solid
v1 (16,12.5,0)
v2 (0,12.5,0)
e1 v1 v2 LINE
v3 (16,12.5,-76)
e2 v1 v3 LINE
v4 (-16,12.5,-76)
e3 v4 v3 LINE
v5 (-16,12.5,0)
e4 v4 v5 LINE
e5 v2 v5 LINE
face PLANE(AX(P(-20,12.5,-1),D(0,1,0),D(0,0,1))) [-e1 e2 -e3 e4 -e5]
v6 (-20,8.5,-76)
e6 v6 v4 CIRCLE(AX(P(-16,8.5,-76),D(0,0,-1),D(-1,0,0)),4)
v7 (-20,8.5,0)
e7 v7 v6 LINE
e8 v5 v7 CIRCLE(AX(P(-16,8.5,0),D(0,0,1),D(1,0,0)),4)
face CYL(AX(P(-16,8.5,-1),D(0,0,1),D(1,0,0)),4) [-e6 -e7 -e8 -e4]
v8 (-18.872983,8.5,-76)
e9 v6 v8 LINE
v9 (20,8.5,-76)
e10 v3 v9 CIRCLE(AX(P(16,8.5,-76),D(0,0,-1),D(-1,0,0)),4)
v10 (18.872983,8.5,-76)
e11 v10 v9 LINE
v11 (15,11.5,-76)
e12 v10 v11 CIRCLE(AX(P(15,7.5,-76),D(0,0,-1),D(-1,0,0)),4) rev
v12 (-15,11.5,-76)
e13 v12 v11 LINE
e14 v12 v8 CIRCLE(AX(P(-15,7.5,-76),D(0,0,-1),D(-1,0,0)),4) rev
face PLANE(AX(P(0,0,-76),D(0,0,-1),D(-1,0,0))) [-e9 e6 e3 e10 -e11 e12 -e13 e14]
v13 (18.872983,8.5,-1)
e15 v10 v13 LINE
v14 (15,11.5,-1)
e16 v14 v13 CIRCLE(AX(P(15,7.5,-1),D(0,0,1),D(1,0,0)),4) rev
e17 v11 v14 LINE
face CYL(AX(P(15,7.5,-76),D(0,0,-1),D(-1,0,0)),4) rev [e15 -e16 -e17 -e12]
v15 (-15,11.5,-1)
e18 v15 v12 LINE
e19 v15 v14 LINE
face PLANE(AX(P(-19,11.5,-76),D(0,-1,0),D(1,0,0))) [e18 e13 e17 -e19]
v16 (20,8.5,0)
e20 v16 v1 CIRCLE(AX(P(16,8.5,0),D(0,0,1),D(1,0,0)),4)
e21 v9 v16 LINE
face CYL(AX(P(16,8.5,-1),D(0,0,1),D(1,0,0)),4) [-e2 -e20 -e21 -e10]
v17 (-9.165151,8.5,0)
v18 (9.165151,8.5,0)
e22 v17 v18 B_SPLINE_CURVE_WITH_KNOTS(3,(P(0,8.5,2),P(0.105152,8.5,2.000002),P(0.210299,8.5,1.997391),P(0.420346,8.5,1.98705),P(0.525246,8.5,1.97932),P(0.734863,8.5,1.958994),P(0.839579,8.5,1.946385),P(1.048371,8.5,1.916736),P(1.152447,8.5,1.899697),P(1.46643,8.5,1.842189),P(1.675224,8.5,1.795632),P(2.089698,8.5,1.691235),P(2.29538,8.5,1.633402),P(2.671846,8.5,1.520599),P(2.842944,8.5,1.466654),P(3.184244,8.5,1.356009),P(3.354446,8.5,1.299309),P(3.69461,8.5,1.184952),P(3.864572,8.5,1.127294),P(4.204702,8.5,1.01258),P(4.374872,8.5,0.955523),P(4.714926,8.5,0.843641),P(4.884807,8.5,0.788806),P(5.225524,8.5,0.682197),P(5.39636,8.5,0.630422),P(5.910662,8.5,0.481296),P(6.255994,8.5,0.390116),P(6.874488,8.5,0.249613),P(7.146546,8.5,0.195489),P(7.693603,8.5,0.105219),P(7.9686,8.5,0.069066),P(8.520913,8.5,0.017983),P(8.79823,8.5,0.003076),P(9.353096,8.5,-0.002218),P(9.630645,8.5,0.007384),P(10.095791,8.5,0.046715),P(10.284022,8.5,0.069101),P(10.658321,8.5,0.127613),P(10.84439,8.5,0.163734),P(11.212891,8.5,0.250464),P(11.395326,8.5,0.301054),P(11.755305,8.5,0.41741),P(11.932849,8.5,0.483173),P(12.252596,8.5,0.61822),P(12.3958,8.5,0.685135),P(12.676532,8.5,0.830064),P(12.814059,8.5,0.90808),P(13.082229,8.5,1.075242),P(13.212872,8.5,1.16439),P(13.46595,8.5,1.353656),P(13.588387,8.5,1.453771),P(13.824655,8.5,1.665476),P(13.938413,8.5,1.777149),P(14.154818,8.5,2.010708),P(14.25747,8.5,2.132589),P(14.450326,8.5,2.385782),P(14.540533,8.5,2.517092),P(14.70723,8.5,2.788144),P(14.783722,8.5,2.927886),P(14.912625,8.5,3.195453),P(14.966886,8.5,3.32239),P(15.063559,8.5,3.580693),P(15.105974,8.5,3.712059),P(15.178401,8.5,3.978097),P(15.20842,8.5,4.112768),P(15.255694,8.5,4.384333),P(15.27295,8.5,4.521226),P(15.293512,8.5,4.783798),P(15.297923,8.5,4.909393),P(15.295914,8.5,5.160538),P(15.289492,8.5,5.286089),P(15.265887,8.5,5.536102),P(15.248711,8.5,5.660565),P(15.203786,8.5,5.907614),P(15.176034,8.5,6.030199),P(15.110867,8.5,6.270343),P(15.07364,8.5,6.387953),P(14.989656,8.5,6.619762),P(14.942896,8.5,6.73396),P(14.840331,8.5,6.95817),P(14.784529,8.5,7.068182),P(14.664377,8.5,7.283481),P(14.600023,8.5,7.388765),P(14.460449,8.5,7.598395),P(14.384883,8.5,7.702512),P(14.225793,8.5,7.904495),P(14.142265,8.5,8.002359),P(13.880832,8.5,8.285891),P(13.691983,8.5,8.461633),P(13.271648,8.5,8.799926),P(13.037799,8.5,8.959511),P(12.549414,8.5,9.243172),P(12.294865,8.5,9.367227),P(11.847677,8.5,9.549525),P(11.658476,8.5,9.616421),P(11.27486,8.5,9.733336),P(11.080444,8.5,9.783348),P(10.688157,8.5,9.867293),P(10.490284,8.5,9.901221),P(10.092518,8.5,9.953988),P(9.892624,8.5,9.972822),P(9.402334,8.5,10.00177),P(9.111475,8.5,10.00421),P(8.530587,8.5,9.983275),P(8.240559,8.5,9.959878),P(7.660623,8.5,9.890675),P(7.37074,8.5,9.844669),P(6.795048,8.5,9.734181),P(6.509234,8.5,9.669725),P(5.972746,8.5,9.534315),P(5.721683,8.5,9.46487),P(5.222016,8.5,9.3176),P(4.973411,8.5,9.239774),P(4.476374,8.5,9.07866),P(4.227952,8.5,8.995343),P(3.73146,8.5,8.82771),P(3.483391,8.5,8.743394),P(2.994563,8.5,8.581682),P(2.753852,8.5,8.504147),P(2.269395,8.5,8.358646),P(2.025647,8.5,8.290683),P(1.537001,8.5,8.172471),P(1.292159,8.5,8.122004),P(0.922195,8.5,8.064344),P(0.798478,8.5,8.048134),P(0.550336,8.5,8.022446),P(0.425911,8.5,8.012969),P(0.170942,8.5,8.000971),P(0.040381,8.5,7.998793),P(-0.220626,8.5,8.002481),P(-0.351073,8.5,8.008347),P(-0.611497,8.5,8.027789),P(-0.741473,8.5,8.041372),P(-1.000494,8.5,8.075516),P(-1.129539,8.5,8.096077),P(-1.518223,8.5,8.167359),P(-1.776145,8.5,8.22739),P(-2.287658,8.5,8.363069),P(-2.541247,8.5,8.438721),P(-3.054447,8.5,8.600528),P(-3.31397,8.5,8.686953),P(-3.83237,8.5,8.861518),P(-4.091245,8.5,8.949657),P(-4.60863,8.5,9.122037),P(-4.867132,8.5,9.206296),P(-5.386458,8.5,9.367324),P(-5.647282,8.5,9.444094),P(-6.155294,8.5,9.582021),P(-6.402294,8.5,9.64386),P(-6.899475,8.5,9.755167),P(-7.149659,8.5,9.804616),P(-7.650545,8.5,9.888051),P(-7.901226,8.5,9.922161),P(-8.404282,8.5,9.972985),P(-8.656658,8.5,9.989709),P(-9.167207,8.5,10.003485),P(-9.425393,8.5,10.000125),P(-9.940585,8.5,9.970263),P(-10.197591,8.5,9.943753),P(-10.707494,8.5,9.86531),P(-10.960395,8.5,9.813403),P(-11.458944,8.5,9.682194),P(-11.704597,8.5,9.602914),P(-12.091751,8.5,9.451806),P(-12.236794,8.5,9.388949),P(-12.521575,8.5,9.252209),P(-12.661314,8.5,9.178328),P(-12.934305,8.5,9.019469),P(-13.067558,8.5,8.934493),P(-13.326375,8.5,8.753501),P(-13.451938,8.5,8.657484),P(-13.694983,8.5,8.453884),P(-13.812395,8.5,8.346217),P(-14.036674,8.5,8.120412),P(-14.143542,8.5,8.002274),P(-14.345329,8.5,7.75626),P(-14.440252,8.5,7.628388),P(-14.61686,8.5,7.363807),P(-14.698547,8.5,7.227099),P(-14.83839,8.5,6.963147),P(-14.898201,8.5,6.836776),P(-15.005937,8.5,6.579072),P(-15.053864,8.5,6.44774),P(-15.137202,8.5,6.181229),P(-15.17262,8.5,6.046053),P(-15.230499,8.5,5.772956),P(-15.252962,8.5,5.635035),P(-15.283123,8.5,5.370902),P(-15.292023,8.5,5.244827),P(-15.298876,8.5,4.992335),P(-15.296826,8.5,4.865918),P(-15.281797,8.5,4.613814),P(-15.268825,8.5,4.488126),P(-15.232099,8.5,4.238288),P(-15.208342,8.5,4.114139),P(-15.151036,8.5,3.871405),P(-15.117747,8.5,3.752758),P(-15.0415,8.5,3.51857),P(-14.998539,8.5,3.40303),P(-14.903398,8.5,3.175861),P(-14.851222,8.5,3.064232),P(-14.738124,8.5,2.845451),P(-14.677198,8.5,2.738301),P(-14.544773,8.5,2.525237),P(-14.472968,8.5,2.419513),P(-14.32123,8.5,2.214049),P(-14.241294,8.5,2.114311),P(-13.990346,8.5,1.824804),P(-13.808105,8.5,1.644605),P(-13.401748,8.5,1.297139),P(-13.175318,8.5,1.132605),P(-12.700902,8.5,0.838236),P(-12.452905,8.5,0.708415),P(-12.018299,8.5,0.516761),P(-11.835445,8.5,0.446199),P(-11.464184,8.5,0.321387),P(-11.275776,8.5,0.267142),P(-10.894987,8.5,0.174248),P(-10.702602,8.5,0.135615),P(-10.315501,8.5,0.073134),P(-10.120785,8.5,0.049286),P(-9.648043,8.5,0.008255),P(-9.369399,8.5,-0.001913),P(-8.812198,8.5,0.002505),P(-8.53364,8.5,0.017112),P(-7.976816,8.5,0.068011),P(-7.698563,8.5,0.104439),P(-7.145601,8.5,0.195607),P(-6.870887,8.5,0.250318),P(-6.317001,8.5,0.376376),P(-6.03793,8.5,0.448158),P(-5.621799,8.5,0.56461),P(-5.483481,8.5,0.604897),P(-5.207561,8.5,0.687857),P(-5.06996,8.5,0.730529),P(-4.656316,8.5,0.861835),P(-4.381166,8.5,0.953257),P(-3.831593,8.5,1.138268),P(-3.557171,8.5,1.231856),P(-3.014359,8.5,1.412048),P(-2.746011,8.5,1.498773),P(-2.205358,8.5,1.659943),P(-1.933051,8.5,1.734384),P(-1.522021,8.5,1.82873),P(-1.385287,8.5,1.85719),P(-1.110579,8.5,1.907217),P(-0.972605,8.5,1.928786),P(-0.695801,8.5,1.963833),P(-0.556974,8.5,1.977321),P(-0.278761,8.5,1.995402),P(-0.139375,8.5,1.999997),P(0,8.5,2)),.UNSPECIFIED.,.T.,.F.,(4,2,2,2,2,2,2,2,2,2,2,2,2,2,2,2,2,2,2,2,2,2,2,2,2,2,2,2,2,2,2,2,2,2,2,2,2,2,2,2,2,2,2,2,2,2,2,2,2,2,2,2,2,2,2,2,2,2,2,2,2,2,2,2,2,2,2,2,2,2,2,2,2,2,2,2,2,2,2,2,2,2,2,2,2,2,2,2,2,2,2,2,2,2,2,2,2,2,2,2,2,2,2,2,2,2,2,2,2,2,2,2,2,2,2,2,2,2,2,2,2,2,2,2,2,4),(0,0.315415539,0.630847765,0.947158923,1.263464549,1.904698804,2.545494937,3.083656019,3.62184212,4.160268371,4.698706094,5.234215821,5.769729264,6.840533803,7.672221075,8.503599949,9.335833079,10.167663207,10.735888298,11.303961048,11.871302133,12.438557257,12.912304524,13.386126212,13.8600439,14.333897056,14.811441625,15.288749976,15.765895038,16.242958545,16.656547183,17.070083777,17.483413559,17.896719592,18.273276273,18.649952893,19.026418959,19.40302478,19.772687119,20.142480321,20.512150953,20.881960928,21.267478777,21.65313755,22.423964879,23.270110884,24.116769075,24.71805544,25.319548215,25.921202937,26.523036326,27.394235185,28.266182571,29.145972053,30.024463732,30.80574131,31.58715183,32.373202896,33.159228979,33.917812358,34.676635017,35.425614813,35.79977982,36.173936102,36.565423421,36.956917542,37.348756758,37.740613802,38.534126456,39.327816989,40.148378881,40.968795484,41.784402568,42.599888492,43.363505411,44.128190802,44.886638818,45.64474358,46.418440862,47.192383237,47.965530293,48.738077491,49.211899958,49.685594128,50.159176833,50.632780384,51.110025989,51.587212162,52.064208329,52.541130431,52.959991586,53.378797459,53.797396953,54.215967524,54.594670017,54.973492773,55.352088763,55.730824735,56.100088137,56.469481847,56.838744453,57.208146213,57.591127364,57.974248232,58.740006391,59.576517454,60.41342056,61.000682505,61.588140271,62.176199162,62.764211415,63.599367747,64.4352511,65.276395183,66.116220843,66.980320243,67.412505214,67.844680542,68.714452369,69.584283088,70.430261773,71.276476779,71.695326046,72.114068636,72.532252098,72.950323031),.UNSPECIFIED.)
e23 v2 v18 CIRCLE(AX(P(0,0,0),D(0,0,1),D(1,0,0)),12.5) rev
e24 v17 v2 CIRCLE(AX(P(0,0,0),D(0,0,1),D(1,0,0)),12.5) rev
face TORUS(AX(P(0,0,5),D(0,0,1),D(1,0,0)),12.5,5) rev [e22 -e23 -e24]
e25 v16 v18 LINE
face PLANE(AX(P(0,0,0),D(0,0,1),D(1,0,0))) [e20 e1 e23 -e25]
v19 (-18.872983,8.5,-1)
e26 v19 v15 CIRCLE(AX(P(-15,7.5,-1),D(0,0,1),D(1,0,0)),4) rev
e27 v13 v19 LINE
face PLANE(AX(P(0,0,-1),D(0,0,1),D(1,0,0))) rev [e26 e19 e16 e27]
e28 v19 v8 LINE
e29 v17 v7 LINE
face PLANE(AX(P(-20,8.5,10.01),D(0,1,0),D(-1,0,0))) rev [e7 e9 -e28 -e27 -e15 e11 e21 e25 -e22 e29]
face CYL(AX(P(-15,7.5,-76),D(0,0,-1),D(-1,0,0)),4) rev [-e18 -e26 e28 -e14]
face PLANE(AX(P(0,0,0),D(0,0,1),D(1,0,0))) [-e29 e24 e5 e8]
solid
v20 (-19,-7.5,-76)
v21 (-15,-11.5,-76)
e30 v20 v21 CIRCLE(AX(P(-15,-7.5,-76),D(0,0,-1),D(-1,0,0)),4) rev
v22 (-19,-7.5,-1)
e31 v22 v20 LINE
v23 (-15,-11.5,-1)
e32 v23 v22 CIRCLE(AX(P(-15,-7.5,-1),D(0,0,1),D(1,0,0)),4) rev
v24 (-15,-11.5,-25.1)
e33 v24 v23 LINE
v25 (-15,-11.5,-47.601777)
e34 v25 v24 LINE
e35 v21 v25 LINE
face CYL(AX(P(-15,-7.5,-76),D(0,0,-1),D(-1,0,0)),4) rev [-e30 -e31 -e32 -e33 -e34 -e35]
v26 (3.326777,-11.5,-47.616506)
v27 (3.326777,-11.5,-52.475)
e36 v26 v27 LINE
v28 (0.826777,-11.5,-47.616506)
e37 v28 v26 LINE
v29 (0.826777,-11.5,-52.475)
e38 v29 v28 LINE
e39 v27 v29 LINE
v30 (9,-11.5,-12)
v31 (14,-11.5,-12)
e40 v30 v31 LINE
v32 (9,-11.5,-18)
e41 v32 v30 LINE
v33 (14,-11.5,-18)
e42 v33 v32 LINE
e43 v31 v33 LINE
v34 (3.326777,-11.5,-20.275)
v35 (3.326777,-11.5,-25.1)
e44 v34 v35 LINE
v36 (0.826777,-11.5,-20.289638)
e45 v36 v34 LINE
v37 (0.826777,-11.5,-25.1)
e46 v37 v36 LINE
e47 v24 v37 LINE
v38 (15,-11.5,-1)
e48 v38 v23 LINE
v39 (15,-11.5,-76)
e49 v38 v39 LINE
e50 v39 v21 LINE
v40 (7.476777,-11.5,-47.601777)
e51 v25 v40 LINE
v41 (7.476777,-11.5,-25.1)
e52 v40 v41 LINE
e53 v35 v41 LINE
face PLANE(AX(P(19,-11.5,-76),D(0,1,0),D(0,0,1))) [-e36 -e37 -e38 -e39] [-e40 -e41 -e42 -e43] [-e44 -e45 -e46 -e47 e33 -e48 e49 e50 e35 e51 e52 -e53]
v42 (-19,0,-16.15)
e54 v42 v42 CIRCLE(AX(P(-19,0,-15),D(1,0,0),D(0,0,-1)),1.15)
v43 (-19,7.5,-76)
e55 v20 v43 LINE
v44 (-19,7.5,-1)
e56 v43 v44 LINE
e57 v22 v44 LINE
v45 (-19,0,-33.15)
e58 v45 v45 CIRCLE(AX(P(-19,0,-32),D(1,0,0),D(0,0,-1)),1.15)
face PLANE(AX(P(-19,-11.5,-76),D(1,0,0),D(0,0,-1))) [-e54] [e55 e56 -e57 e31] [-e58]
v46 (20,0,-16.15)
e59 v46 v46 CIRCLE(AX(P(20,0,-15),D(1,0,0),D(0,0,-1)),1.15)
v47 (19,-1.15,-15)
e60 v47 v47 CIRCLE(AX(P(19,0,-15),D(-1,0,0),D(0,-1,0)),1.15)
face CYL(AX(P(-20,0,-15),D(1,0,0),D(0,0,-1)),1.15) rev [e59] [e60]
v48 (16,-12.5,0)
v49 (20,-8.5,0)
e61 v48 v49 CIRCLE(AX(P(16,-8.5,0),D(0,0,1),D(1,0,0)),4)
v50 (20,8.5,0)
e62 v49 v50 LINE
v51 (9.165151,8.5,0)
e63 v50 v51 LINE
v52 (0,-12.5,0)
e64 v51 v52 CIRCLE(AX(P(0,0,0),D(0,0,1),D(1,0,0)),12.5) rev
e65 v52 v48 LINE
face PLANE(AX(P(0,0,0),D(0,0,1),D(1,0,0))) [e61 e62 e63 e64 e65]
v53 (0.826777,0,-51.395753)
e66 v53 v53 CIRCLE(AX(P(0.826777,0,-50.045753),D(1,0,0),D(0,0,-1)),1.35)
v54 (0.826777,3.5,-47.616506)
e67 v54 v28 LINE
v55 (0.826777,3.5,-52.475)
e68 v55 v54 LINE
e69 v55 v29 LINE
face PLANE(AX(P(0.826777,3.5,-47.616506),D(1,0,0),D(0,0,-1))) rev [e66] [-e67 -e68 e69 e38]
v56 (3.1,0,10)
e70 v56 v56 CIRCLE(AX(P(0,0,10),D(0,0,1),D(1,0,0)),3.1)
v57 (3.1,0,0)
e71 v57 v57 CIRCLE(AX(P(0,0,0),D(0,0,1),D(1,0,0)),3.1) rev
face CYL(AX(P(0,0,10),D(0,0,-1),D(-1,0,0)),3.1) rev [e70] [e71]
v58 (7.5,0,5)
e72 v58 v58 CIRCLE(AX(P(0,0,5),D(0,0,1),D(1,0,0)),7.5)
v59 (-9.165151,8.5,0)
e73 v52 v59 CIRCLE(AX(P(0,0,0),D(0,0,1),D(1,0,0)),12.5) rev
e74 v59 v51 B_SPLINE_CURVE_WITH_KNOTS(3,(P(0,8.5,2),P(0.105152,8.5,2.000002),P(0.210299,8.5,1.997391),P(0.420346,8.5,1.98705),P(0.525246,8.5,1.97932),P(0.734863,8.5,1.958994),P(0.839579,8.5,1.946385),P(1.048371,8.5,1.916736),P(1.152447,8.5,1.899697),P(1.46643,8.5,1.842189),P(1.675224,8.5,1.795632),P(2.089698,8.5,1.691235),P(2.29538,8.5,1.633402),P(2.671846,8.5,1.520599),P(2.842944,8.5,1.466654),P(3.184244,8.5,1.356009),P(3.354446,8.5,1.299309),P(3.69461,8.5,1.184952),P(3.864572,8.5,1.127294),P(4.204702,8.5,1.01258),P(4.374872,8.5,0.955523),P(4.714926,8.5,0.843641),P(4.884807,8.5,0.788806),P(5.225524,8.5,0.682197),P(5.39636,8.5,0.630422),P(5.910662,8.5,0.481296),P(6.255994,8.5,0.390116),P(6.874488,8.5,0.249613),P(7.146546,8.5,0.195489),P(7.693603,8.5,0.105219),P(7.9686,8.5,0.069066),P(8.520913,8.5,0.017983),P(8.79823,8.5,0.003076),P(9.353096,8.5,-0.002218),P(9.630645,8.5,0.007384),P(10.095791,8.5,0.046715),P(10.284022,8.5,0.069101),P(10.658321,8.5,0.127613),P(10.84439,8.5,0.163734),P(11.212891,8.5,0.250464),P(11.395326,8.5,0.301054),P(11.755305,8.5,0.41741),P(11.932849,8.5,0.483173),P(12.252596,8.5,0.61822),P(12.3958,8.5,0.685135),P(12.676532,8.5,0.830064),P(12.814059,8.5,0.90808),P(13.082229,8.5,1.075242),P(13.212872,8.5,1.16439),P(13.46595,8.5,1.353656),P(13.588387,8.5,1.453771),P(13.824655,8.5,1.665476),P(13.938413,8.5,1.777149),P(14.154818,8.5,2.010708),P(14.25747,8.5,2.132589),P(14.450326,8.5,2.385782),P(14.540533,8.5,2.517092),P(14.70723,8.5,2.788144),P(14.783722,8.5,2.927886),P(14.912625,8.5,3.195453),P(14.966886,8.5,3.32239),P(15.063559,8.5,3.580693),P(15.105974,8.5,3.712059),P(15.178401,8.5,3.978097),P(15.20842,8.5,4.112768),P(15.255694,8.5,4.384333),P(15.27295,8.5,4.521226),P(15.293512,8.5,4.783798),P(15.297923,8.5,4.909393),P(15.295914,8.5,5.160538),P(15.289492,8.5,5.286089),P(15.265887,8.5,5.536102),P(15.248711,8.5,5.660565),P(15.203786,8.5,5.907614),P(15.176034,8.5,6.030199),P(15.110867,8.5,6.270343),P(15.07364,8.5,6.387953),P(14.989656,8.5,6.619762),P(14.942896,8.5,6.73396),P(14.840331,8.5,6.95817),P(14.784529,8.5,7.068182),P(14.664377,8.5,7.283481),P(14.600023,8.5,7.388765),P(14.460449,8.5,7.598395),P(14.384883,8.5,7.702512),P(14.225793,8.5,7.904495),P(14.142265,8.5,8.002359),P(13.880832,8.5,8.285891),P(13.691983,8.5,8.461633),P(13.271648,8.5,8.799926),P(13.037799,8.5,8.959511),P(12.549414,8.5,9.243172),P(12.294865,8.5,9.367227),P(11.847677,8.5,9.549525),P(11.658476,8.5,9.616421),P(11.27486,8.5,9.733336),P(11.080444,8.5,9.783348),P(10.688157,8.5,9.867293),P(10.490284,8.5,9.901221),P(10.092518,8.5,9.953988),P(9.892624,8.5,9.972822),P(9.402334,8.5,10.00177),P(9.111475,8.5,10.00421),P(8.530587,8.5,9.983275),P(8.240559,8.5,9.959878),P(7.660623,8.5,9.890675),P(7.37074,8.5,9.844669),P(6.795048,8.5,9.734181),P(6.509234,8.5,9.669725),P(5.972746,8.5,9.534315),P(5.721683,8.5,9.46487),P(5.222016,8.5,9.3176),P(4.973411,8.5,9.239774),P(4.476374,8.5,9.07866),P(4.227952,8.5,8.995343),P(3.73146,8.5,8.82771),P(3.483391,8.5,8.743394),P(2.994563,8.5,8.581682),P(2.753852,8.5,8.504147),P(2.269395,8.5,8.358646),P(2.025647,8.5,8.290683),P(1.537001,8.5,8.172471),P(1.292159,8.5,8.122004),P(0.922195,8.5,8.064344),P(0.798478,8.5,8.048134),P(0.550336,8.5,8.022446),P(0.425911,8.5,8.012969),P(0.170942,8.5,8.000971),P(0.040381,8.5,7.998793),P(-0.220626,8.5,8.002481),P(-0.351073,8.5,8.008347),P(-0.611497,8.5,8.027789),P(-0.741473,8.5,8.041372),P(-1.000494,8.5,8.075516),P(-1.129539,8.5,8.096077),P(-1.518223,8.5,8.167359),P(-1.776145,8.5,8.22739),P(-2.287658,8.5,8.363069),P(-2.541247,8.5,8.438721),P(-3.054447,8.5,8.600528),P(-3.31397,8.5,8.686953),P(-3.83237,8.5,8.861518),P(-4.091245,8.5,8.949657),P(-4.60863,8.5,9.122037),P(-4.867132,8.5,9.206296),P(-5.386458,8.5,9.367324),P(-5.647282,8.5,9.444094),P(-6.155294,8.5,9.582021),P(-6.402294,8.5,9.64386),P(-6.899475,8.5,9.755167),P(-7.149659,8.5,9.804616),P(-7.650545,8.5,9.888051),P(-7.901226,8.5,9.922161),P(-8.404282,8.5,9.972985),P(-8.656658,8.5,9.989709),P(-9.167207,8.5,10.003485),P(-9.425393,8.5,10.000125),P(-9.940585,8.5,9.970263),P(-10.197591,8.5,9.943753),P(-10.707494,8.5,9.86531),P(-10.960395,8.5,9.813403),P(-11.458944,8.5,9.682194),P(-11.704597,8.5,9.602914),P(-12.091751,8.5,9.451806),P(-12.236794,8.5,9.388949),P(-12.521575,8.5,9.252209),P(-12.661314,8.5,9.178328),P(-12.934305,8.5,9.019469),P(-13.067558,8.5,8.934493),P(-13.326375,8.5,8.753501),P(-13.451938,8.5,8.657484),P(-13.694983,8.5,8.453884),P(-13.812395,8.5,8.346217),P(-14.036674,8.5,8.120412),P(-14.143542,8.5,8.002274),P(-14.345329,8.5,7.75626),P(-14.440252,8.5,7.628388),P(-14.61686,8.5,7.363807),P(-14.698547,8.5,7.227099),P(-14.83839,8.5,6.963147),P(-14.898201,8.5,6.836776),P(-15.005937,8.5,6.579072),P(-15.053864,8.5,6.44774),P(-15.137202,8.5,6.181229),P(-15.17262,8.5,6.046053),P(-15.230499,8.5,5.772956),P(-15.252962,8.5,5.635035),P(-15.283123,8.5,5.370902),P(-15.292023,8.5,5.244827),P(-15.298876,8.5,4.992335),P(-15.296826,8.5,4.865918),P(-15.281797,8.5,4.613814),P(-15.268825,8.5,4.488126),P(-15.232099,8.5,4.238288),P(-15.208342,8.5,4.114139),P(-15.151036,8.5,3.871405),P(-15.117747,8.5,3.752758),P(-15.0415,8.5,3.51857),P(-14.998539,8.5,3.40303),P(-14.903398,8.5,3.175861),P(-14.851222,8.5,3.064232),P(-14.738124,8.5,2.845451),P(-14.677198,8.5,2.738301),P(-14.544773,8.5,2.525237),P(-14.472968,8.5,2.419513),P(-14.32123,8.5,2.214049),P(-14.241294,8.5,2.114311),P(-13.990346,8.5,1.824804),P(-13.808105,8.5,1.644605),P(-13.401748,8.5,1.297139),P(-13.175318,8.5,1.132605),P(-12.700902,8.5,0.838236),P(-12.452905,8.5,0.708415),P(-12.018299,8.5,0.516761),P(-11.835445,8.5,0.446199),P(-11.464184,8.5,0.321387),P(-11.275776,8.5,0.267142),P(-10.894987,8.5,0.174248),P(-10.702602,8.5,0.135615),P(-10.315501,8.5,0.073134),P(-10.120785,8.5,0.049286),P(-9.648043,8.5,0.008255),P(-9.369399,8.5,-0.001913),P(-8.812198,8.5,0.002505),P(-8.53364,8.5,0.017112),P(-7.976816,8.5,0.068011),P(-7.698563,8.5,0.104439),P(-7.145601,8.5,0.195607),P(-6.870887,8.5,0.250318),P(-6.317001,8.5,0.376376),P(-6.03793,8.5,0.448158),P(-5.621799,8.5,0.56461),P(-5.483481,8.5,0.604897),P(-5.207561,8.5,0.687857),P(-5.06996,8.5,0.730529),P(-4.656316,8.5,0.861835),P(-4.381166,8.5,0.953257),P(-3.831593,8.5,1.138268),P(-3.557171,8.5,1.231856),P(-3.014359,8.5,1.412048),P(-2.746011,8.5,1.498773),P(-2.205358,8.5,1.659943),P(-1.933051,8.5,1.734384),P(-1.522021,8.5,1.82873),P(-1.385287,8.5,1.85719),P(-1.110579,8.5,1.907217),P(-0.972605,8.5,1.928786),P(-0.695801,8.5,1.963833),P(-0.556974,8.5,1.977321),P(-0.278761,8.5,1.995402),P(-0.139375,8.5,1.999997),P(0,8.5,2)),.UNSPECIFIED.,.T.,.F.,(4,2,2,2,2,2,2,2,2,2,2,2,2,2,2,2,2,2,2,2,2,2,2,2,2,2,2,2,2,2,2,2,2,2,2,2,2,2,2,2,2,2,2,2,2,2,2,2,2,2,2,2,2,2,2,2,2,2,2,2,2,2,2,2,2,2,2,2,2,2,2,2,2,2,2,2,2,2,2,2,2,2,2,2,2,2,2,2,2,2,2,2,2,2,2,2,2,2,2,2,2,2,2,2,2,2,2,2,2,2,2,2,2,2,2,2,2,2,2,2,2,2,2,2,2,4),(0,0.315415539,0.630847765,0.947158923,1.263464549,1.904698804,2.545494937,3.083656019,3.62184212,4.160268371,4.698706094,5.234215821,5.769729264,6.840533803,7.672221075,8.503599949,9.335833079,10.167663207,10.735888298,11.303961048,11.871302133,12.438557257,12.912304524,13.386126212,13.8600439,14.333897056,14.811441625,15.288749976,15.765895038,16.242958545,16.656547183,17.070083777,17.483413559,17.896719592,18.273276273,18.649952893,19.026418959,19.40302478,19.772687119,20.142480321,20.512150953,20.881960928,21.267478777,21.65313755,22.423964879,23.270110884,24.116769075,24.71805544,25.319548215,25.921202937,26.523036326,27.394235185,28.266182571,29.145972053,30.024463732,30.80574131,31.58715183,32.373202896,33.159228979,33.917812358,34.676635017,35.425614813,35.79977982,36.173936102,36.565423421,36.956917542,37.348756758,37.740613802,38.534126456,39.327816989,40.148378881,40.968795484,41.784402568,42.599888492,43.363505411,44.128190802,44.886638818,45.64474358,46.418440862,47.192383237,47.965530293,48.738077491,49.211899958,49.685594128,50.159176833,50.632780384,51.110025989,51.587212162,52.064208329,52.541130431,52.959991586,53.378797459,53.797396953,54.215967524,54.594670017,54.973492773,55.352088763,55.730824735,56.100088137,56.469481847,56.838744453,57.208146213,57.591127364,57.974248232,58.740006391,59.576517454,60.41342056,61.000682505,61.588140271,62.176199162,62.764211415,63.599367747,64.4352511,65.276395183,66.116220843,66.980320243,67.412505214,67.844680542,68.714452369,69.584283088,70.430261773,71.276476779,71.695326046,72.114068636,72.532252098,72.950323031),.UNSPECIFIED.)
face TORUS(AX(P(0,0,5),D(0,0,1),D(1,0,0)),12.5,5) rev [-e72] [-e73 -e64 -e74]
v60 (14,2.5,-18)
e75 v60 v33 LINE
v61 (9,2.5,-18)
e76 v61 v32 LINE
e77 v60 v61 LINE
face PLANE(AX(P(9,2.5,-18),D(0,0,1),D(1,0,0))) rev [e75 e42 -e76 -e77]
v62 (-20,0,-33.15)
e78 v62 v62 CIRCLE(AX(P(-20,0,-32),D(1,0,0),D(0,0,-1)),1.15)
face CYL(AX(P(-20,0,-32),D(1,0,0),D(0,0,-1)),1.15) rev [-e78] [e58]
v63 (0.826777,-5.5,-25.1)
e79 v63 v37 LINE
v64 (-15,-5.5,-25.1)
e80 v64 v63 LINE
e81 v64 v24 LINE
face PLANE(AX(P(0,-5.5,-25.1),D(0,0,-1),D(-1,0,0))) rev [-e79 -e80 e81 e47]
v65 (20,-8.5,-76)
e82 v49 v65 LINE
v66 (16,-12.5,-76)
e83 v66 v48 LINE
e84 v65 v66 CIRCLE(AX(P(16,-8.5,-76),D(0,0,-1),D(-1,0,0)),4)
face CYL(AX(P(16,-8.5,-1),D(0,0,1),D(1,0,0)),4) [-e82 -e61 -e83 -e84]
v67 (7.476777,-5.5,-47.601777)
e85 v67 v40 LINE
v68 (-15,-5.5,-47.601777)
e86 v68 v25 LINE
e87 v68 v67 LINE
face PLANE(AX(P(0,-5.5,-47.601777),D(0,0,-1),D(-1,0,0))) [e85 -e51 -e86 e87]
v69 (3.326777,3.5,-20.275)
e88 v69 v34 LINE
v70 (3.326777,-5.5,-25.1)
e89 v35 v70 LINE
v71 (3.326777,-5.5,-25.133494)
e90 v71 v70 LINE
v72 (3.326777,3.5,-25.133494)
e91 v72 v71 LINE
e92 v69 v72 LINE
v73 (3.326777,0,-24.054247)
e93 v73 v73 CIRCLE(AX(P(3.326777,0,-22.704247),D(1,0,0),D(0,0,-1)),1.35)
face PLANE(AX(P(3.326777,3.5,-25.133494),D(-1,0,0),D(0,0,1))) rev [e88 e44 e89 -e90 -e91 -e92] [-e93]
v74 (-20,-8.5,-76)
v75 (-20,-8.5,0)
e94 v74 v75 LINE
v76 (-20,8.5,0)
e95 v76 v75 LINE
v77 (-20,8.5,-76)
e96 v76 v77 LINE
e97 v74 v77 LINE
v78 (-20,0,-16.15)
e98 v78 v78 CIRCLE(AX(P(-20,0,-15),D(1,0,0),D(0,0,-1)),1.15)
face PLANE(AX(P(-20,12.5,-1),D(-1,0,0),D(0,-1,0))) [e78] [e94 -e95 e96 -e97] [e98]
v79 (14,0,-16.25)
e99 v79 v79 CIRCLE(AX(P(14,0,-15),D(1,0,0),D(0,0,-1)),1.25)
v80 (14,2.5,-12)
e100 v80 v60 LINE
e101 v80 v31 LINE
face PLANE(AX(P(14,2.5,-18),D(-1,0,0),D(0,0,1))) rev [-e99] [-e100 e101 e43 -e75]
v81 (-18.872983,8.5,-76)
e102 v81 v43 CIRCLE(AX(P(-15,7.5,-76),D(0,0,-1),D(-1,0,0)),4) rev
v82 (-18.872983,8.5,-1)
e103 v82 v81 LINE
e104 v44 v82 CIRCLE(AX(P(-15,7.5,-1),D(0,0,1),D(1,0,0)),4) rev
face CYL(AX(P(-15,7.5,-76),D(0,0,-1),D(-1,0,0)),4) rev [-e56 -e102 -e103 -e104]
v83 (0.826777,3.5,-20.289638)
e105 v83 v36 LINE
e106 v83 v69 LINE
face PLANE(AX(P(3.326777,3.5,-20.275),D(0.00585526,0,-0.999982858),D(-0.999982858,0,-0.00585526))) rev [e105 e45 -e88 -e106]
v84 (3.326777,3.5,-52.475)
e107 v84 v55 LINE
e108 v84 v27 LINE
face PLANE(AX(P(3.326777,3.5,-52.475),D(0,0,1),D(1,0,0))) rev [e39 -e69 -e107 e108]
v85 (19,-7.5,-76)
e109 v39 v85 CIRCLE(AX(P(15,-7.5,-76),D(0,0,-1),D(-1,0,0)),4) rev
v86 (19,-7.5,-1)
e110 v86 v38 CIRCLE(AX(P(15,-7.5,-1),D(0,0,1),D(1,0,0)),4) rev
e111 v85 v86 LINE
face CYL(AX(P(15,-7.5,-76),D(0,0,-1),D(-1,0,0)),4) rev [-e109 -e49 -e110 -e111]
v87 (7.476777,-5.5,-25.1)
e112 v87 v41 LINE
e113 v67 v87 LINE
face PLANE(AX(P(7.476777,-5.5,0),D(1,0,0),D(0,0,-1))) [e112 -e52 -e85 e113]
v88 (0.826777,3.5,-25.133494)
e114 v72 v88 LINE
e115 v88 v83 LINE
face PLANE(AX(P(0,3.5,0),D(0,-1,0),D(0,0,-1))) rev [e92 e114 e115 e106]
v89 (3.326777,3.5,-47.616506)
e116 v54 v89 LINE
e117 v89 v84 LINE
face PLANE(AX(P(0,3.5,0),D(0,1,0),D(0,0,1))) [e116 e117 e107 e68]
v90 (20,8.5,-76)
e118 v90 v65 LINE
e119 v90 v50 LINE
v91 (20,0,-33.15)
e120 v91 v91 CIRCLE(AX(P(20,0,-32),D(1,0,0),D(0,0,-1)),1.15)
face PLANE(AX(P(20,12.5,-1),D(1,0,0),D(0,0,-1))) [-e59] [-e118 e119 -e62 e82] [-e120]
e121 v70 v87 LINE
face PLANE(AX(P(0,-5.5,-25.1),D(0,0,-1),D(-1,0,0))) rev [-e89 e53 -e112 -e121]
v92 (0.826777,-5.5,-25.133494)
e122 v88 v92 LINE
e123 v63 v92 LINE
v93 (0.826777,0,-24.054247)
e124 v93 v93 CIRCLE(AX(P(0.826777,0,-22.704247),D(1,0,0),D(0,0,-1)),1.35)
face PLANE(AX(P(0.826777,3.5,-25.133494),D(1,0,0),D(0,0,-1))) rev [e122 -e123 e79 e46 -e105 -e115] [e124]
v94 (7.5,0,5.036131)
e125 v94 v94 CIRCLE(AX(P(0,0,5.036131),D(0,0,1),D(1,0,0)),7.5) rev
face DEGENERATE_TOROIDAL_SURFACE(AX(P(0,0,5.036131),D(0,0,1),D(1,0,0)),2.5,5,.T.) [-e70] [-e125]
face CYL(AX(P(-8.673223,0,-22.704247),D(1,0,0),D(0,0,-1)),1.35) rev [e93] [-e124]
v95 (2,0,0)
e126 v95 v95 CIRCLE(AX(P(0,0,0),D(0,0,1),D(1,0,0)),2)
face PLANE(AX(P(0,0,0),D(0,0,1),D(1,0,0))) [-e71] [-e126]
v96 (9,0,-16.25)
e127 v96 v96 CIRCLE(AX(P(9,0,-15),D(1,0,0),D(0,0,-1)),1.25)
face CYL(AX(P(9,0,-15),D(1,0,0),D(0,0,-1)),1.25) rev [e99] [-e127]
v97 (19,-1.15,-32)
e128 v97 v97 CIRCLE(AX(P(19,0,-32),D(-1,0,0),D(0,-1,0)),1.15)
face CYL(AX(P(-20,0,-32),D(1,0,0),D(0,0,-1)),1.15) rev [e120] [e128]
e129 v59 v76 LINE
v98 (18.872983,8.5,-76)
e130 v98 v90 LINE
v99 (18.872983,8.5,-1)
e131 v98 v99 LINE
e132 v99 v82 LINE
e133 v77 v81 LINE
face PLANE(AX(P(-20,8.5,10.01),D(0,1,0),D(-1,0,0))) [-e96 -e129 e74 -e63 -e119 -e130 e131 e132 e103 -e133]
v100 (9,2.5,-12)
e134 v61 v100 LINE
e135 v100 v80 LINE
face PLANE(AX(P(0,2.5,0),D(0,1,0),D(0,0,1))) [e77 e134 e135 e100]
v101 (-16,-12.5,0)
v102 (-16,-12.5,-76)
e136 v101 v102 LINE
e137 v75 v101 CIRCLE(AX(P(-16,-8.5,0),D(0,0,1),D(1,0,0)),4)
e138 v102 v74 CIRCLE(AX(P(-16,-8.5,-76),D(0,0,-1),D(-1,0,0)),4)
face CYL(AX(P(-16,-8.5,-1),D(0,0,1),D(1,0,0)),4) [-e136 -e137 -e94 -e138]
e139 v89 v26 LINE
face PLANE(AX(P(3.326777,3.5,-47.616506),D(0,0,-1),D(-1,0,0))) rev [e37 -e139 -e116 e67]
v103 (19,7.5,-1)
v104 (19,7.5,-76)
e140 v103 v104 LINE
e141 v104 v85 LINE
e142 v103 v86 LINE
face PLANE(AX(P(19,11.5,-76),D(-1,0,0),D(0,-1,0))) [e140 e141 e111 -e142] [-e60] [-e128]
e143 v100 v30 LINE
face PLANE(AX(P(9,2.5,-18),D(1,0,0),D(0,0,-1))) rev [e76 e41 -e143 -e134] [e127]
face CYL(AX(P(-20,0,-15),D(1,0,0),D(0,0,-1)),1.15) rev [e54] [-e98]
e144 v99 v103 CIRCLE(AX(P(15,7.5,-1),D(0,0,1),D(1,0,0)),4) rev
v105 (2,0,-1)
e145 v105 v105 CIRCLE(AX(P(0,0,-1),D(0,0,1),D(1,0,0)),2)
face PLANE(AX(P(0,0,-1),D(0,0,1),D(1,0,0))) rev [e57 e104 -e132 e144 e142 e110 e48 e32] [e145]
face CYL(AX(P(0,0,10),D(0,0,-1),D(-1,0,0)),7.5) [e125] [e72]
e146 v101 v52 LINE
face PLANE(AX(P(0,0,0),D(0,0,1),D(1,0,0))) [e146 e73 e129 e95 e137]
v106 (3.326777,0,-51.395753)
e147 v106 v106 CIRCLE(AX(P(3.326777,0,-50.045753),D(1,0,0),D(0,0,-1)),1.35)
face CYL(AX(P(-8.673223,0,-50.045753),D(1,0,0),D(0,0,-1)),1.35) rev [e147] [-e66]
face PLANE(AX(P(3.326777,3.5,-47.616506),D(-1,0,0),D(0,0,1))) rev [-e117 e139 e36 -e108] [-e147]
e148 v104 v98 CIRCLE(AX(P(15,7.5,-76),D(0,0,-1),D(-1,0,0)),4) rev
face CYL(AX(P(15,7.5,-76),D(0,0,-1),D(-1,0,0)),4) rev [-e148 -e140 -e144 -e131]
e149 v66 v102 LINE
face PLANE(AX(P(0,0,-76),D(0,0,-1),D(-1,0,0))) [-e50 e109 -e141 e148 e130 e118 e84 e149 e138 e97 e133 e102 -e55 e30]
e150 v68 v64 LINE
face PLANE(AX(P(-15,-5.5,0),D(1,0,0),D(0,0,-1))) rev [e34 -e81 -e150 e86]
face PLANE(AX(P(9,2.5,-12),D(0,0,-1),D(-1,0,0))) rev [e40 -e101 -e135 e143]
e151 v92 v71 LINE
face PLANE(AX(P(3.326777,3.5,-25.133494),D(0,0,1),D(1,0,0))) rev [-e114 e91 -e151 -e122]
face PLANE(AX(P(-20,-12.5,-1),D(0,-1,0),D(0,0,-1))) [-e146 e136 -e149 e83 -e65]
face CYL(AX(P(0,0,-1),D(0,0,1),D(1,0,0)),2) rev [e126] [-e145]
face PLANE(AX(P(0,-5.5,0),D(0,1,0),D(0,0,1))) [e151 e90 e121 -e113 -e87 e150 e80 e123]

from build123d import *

# Parameters (mm, degrees)
SKETCH1_W              = 40
SKETCH1_H              = 25
SKETCH1_R              = 2
BOSS_EXTRUDE1_DEPTH    = 1
SKETCH2_W              = 40
SKETCH2_H              = 25
SKETCH2_W_2            = 38
SKETCH2_H_2            = 23
BOSS_EXTRUDE2_DEPTH    = 75
FILLET2_R              = 4
SKETCH4_R              = 7.5
SKETCH4_R_2            = 3.1
BOSS_EXTRUDE3_DEPTH    = 10
FILLET3_R              = 5
SKETCH5_R              = 1.15
CUT_EXTRUDE1_DEPTH     = 87.788536109
SKETCH10_W             = 22.476776695
SKETCH10_H             = 7.4
SKETCH10_H_2           = 15.101776695
BOSS_EXTRUDE4_DEPTH    = 6
SKETCH12_W             = 2.5
SKETCH12_H             = 4.858493649
BOSS_EXTRUDE5_DEPTH    = 15
SKETCH13_R             = 1.35
CUT_EXTRUDE3_DEPTH     = 12
SKETCH15_W             = 5
SKETCH15_H             = 6
BOSS_EXTRUDE6_DEPTH    = 14
SKETCH16_R             = 1.25
CUT_EXTRUDE4_DEPTH     = 5
SPLIT1_SURFACE_1_BACK  = 99.087
SPLIT1_SURFACE_1_DEPTH = 198.174
SPLIT1_SURFACE_2_BACK  = 99.087
SPLIT1_SURFACE_2_DEPTH = 198.174


with BuildPart() as part:
    # Sketch1 → Boss-Extrude1 (new body)
    with BuildSketch(Plane.XY):
        Rectangle(SKETCH1_W, SKETCH1_H)
        Circle(SKETCH1_R, mode=Mode.SUBTRACT)
    extrude(amount=-BOSS_EXTRUDE1_DEPTH)

    # Sketch2 → Boss-Extrude2 (add)
    with BuildSketch(Plane(origin=(0, 0, -1), x_dir=(-1, 0, 0), z_dir=(0, 0, -1))):
        Rectangle(SKETCH2_W, SKETCH2_H)
        Rectangle(SKETCH2_W_2, SKETCH2_H_2, mode=Mode.SUBTRACT)
    extrude(amount=BOSS_EXTRUDE2_DEPTH)

    # Fillet2
    fillet2_edges = [part.edges().sort_by_distance(p)[0] for p in [
        (-19, 11.5, -38.5),
        (19, 11.5, -38.5),
        (19, -11.5, -38.5),
        (-19, -11.5, -38.5),
        (20, -12.5, -38),
        (-20, -12.5, -38),
        (-20, 12.5, -38),
        (20, 12.5, -38),
    ]]
    fillet(fillet2_edges, radius=FILLET2_R)

    # Sketch4 → Boss-Extrude3 (add)
    with BuildSketch(Plane.XY):
        Circle(SKETCH4_R)
        Circle(SKETCH4_R_2, mode=Mode.SUBTRACT)
    extrude(amount=BOSS_EXTRUDE3_DEPTH)

    # Fillet3
    # the kernel refuses this fillet: 5 mm, written as the material it adds along each edge
    with BuildSketch(Plane(origin=(0, 0, 0), x_dir=(1, 0, 0), z_dir=(0, -1, 0))) as fillet3_piece_1:
        with BuildLine():
            CenterArc((7.5 + FILLET3_R, FILLET3_R), FILLET3_R, 180, 90)
            Line((7.5, FILLET3_R), (7.5, 0))
            Line((7.5, 0), (7.5 + FILLET3_R, 0))
        make_face()
    revolve(axis=Axis((0, 0, 0), (0, 0, 1)))
    # the kernel refuses this fillet: 5 mm, written as the material it takes off along each edge
    with BuildSketch(Plane(origin=(0, 0, 10), x_dir=(1, 0, 0), z_dir=(0, -1, 0))) as fillet3_2_piece_1:
        with BuildLine():
            CenterArc((2.5, -4.963869458), FILLET3_R, 0, 83.107897421)
            Line((3.1, 0), (7.5, 0))
            Line((7.5, 0), (7.5, -4.963869458))
        make_face()
    revolve(axis=Axis((0, 0, 10), (0, 0, 1)), mode=Mode.SUBTRACT)

    # Sketch5 → Cut-Extrude1 (cut, through all)
    with BuildSketch(Plane(origin=(20, 0, 0), x_dir=(0, 0, -1), z_dir=(1, 0, 0))):
        with Locations((15, 0)):
            Circle(SKETCH5_R)
        with Locations((32, 0)):
            Circle(SKETCH5_R)
    extrude(amount=-CUT_EXTRUDE1_DEPTH, mode=Mode.SUBTRACT)

    # Sketch10 → Boss-Extrude4 (add)
    with BuildSketch(Plane(origin=(0, -11.5, 0), x_dir=(1, 0, 0), z_dir=(0, 1, 0))):
        with Locations((-3.761611653, 28.8)):
            Rectangle(SKETCH10_W, SKETCH10_H)
        with Locations((-3.761611653, 40.050888348)):
            Rectangle(SKETCH10_W, SKETCH10_H_2)
    extrude(amount=BOSS_EXTRUDE4_DEPTH)

    # Sketch12 → Boss-Extrude5 (add)
    with BuildSketch(Plane(origin=(0, -11.5, 0), x_dir=(1, 0, 0), z_dir=(0, 1, 0))):
        with Locations((2.076776695, 50.045753176)):
            Rectangle(SKETCH12_W, SKETCH12_H)
        Polygon((3.326776695, 25.133493649), (0.826776695, 25.133493649), (0.826776695, 20.289638402), (3.326776695, 20.275), align=None)
    extrude(amount=BOSS_EXTRUDE5_DEPTH)

    # Sketch13 → Cut-Extrude3 (cut)
    with BuildSketch(Plane(origin=(3.326776695, 0, 0), x_dir=(0, 0, -1), z_dir=(1, 0, 0))):
        with Locations((22.704246825, 0)):
            Circle(SKETCH13_R)
        with Locations((50.045753175, 0)):
            Circle(SKETCH13_R)
    extrude(amount=-CUT_EXTRUDE3_DEPTH, mode=Mode.SUBTRACT)

    # Sketch15 → Boss-Extrude6 (add)
    with BuildSketch(Plane(origin=(0, -11.5, 0), x_dir=(1, 0, 0), z_dir=(0, 1, 0))):
        with Locations((11.5, 15)):
            Rectangle(SKETCH15_W, SKETCH15_H)
    extrude(amount=BOSS_EXTRUDE6_DEPTH)

    # Sketch16 → Cut-Extrude4 (cut)
    with BuildSketch(Plane(origin=(14, 0, 0), x_dir=(0, 0, -1), z_dir=(1, 0, 0))):
        with Locations((15, 0)):
            Circle(SKETCH16_R)
    extrude(amount=-CUT_EXTRUDE4_DEPTH, mode=Mode.SUBTRACT)


with BuildPart() as body_2:
    # Split1: the piece behind the surface
    add(part.part)
    # Split1 surface: a surface, the sketch's curves swept straight by 198.174 mm
    with BuildLine(Plane(origin=(0, 0, -76), x_dir=(-1, 0, 0), z_dir=(0, 0, -1)).offset(-SPLIT1_SURFACE_1_BACK), mode=Mode.PRIVATE) as split1_surface_1_path:
        Line((20, 8.5), (-20, 8.5))
    split1_surface_1 = Shell.extrude(split1_surface_1_path.wire(), (0 * SPLIT1_SURFACE_1_DEPTH, 0 * SPLIT1_SURFACE_1_DEPTH, -1 * SPLIT1_SURFACE_1_DEPTH))
    split(bisect_by=split1_surface_1, keep=Keep.BOTTOM)


with BuildPart() as part_1:
    add(part.part)

    # Split1: split by a surface, the side it looks to stays
    # Split1 surface: a surface, the sketch's curves swept straight by 198.174 mm
    with BuildLine(Plane(origin=(0, 0, -76), x_dir=(-1, 0, 0), z_dir=(0, 0, -1)).offset(-SPLIT1_SURFACE_2_BACK), mode=Mode.PRIVATE) as split1_surface_2_path:
        Line((20, 8.5), (-20, 8.5))
    split1_surface_2 = Shell.extrude(split1_surface_2_path.wire(), (0 * SPLIT1_SURFACE_2_DEPTH, 0 * SPLIT1_SURFACE_2_DEPTH, -1 * SPLIT1_SURFACE_2_DEPTH))
    split(bisect_by=split1_surface_2, keep=Keep.TOP)


solid = Compound([body_2.part, part_1.part])
